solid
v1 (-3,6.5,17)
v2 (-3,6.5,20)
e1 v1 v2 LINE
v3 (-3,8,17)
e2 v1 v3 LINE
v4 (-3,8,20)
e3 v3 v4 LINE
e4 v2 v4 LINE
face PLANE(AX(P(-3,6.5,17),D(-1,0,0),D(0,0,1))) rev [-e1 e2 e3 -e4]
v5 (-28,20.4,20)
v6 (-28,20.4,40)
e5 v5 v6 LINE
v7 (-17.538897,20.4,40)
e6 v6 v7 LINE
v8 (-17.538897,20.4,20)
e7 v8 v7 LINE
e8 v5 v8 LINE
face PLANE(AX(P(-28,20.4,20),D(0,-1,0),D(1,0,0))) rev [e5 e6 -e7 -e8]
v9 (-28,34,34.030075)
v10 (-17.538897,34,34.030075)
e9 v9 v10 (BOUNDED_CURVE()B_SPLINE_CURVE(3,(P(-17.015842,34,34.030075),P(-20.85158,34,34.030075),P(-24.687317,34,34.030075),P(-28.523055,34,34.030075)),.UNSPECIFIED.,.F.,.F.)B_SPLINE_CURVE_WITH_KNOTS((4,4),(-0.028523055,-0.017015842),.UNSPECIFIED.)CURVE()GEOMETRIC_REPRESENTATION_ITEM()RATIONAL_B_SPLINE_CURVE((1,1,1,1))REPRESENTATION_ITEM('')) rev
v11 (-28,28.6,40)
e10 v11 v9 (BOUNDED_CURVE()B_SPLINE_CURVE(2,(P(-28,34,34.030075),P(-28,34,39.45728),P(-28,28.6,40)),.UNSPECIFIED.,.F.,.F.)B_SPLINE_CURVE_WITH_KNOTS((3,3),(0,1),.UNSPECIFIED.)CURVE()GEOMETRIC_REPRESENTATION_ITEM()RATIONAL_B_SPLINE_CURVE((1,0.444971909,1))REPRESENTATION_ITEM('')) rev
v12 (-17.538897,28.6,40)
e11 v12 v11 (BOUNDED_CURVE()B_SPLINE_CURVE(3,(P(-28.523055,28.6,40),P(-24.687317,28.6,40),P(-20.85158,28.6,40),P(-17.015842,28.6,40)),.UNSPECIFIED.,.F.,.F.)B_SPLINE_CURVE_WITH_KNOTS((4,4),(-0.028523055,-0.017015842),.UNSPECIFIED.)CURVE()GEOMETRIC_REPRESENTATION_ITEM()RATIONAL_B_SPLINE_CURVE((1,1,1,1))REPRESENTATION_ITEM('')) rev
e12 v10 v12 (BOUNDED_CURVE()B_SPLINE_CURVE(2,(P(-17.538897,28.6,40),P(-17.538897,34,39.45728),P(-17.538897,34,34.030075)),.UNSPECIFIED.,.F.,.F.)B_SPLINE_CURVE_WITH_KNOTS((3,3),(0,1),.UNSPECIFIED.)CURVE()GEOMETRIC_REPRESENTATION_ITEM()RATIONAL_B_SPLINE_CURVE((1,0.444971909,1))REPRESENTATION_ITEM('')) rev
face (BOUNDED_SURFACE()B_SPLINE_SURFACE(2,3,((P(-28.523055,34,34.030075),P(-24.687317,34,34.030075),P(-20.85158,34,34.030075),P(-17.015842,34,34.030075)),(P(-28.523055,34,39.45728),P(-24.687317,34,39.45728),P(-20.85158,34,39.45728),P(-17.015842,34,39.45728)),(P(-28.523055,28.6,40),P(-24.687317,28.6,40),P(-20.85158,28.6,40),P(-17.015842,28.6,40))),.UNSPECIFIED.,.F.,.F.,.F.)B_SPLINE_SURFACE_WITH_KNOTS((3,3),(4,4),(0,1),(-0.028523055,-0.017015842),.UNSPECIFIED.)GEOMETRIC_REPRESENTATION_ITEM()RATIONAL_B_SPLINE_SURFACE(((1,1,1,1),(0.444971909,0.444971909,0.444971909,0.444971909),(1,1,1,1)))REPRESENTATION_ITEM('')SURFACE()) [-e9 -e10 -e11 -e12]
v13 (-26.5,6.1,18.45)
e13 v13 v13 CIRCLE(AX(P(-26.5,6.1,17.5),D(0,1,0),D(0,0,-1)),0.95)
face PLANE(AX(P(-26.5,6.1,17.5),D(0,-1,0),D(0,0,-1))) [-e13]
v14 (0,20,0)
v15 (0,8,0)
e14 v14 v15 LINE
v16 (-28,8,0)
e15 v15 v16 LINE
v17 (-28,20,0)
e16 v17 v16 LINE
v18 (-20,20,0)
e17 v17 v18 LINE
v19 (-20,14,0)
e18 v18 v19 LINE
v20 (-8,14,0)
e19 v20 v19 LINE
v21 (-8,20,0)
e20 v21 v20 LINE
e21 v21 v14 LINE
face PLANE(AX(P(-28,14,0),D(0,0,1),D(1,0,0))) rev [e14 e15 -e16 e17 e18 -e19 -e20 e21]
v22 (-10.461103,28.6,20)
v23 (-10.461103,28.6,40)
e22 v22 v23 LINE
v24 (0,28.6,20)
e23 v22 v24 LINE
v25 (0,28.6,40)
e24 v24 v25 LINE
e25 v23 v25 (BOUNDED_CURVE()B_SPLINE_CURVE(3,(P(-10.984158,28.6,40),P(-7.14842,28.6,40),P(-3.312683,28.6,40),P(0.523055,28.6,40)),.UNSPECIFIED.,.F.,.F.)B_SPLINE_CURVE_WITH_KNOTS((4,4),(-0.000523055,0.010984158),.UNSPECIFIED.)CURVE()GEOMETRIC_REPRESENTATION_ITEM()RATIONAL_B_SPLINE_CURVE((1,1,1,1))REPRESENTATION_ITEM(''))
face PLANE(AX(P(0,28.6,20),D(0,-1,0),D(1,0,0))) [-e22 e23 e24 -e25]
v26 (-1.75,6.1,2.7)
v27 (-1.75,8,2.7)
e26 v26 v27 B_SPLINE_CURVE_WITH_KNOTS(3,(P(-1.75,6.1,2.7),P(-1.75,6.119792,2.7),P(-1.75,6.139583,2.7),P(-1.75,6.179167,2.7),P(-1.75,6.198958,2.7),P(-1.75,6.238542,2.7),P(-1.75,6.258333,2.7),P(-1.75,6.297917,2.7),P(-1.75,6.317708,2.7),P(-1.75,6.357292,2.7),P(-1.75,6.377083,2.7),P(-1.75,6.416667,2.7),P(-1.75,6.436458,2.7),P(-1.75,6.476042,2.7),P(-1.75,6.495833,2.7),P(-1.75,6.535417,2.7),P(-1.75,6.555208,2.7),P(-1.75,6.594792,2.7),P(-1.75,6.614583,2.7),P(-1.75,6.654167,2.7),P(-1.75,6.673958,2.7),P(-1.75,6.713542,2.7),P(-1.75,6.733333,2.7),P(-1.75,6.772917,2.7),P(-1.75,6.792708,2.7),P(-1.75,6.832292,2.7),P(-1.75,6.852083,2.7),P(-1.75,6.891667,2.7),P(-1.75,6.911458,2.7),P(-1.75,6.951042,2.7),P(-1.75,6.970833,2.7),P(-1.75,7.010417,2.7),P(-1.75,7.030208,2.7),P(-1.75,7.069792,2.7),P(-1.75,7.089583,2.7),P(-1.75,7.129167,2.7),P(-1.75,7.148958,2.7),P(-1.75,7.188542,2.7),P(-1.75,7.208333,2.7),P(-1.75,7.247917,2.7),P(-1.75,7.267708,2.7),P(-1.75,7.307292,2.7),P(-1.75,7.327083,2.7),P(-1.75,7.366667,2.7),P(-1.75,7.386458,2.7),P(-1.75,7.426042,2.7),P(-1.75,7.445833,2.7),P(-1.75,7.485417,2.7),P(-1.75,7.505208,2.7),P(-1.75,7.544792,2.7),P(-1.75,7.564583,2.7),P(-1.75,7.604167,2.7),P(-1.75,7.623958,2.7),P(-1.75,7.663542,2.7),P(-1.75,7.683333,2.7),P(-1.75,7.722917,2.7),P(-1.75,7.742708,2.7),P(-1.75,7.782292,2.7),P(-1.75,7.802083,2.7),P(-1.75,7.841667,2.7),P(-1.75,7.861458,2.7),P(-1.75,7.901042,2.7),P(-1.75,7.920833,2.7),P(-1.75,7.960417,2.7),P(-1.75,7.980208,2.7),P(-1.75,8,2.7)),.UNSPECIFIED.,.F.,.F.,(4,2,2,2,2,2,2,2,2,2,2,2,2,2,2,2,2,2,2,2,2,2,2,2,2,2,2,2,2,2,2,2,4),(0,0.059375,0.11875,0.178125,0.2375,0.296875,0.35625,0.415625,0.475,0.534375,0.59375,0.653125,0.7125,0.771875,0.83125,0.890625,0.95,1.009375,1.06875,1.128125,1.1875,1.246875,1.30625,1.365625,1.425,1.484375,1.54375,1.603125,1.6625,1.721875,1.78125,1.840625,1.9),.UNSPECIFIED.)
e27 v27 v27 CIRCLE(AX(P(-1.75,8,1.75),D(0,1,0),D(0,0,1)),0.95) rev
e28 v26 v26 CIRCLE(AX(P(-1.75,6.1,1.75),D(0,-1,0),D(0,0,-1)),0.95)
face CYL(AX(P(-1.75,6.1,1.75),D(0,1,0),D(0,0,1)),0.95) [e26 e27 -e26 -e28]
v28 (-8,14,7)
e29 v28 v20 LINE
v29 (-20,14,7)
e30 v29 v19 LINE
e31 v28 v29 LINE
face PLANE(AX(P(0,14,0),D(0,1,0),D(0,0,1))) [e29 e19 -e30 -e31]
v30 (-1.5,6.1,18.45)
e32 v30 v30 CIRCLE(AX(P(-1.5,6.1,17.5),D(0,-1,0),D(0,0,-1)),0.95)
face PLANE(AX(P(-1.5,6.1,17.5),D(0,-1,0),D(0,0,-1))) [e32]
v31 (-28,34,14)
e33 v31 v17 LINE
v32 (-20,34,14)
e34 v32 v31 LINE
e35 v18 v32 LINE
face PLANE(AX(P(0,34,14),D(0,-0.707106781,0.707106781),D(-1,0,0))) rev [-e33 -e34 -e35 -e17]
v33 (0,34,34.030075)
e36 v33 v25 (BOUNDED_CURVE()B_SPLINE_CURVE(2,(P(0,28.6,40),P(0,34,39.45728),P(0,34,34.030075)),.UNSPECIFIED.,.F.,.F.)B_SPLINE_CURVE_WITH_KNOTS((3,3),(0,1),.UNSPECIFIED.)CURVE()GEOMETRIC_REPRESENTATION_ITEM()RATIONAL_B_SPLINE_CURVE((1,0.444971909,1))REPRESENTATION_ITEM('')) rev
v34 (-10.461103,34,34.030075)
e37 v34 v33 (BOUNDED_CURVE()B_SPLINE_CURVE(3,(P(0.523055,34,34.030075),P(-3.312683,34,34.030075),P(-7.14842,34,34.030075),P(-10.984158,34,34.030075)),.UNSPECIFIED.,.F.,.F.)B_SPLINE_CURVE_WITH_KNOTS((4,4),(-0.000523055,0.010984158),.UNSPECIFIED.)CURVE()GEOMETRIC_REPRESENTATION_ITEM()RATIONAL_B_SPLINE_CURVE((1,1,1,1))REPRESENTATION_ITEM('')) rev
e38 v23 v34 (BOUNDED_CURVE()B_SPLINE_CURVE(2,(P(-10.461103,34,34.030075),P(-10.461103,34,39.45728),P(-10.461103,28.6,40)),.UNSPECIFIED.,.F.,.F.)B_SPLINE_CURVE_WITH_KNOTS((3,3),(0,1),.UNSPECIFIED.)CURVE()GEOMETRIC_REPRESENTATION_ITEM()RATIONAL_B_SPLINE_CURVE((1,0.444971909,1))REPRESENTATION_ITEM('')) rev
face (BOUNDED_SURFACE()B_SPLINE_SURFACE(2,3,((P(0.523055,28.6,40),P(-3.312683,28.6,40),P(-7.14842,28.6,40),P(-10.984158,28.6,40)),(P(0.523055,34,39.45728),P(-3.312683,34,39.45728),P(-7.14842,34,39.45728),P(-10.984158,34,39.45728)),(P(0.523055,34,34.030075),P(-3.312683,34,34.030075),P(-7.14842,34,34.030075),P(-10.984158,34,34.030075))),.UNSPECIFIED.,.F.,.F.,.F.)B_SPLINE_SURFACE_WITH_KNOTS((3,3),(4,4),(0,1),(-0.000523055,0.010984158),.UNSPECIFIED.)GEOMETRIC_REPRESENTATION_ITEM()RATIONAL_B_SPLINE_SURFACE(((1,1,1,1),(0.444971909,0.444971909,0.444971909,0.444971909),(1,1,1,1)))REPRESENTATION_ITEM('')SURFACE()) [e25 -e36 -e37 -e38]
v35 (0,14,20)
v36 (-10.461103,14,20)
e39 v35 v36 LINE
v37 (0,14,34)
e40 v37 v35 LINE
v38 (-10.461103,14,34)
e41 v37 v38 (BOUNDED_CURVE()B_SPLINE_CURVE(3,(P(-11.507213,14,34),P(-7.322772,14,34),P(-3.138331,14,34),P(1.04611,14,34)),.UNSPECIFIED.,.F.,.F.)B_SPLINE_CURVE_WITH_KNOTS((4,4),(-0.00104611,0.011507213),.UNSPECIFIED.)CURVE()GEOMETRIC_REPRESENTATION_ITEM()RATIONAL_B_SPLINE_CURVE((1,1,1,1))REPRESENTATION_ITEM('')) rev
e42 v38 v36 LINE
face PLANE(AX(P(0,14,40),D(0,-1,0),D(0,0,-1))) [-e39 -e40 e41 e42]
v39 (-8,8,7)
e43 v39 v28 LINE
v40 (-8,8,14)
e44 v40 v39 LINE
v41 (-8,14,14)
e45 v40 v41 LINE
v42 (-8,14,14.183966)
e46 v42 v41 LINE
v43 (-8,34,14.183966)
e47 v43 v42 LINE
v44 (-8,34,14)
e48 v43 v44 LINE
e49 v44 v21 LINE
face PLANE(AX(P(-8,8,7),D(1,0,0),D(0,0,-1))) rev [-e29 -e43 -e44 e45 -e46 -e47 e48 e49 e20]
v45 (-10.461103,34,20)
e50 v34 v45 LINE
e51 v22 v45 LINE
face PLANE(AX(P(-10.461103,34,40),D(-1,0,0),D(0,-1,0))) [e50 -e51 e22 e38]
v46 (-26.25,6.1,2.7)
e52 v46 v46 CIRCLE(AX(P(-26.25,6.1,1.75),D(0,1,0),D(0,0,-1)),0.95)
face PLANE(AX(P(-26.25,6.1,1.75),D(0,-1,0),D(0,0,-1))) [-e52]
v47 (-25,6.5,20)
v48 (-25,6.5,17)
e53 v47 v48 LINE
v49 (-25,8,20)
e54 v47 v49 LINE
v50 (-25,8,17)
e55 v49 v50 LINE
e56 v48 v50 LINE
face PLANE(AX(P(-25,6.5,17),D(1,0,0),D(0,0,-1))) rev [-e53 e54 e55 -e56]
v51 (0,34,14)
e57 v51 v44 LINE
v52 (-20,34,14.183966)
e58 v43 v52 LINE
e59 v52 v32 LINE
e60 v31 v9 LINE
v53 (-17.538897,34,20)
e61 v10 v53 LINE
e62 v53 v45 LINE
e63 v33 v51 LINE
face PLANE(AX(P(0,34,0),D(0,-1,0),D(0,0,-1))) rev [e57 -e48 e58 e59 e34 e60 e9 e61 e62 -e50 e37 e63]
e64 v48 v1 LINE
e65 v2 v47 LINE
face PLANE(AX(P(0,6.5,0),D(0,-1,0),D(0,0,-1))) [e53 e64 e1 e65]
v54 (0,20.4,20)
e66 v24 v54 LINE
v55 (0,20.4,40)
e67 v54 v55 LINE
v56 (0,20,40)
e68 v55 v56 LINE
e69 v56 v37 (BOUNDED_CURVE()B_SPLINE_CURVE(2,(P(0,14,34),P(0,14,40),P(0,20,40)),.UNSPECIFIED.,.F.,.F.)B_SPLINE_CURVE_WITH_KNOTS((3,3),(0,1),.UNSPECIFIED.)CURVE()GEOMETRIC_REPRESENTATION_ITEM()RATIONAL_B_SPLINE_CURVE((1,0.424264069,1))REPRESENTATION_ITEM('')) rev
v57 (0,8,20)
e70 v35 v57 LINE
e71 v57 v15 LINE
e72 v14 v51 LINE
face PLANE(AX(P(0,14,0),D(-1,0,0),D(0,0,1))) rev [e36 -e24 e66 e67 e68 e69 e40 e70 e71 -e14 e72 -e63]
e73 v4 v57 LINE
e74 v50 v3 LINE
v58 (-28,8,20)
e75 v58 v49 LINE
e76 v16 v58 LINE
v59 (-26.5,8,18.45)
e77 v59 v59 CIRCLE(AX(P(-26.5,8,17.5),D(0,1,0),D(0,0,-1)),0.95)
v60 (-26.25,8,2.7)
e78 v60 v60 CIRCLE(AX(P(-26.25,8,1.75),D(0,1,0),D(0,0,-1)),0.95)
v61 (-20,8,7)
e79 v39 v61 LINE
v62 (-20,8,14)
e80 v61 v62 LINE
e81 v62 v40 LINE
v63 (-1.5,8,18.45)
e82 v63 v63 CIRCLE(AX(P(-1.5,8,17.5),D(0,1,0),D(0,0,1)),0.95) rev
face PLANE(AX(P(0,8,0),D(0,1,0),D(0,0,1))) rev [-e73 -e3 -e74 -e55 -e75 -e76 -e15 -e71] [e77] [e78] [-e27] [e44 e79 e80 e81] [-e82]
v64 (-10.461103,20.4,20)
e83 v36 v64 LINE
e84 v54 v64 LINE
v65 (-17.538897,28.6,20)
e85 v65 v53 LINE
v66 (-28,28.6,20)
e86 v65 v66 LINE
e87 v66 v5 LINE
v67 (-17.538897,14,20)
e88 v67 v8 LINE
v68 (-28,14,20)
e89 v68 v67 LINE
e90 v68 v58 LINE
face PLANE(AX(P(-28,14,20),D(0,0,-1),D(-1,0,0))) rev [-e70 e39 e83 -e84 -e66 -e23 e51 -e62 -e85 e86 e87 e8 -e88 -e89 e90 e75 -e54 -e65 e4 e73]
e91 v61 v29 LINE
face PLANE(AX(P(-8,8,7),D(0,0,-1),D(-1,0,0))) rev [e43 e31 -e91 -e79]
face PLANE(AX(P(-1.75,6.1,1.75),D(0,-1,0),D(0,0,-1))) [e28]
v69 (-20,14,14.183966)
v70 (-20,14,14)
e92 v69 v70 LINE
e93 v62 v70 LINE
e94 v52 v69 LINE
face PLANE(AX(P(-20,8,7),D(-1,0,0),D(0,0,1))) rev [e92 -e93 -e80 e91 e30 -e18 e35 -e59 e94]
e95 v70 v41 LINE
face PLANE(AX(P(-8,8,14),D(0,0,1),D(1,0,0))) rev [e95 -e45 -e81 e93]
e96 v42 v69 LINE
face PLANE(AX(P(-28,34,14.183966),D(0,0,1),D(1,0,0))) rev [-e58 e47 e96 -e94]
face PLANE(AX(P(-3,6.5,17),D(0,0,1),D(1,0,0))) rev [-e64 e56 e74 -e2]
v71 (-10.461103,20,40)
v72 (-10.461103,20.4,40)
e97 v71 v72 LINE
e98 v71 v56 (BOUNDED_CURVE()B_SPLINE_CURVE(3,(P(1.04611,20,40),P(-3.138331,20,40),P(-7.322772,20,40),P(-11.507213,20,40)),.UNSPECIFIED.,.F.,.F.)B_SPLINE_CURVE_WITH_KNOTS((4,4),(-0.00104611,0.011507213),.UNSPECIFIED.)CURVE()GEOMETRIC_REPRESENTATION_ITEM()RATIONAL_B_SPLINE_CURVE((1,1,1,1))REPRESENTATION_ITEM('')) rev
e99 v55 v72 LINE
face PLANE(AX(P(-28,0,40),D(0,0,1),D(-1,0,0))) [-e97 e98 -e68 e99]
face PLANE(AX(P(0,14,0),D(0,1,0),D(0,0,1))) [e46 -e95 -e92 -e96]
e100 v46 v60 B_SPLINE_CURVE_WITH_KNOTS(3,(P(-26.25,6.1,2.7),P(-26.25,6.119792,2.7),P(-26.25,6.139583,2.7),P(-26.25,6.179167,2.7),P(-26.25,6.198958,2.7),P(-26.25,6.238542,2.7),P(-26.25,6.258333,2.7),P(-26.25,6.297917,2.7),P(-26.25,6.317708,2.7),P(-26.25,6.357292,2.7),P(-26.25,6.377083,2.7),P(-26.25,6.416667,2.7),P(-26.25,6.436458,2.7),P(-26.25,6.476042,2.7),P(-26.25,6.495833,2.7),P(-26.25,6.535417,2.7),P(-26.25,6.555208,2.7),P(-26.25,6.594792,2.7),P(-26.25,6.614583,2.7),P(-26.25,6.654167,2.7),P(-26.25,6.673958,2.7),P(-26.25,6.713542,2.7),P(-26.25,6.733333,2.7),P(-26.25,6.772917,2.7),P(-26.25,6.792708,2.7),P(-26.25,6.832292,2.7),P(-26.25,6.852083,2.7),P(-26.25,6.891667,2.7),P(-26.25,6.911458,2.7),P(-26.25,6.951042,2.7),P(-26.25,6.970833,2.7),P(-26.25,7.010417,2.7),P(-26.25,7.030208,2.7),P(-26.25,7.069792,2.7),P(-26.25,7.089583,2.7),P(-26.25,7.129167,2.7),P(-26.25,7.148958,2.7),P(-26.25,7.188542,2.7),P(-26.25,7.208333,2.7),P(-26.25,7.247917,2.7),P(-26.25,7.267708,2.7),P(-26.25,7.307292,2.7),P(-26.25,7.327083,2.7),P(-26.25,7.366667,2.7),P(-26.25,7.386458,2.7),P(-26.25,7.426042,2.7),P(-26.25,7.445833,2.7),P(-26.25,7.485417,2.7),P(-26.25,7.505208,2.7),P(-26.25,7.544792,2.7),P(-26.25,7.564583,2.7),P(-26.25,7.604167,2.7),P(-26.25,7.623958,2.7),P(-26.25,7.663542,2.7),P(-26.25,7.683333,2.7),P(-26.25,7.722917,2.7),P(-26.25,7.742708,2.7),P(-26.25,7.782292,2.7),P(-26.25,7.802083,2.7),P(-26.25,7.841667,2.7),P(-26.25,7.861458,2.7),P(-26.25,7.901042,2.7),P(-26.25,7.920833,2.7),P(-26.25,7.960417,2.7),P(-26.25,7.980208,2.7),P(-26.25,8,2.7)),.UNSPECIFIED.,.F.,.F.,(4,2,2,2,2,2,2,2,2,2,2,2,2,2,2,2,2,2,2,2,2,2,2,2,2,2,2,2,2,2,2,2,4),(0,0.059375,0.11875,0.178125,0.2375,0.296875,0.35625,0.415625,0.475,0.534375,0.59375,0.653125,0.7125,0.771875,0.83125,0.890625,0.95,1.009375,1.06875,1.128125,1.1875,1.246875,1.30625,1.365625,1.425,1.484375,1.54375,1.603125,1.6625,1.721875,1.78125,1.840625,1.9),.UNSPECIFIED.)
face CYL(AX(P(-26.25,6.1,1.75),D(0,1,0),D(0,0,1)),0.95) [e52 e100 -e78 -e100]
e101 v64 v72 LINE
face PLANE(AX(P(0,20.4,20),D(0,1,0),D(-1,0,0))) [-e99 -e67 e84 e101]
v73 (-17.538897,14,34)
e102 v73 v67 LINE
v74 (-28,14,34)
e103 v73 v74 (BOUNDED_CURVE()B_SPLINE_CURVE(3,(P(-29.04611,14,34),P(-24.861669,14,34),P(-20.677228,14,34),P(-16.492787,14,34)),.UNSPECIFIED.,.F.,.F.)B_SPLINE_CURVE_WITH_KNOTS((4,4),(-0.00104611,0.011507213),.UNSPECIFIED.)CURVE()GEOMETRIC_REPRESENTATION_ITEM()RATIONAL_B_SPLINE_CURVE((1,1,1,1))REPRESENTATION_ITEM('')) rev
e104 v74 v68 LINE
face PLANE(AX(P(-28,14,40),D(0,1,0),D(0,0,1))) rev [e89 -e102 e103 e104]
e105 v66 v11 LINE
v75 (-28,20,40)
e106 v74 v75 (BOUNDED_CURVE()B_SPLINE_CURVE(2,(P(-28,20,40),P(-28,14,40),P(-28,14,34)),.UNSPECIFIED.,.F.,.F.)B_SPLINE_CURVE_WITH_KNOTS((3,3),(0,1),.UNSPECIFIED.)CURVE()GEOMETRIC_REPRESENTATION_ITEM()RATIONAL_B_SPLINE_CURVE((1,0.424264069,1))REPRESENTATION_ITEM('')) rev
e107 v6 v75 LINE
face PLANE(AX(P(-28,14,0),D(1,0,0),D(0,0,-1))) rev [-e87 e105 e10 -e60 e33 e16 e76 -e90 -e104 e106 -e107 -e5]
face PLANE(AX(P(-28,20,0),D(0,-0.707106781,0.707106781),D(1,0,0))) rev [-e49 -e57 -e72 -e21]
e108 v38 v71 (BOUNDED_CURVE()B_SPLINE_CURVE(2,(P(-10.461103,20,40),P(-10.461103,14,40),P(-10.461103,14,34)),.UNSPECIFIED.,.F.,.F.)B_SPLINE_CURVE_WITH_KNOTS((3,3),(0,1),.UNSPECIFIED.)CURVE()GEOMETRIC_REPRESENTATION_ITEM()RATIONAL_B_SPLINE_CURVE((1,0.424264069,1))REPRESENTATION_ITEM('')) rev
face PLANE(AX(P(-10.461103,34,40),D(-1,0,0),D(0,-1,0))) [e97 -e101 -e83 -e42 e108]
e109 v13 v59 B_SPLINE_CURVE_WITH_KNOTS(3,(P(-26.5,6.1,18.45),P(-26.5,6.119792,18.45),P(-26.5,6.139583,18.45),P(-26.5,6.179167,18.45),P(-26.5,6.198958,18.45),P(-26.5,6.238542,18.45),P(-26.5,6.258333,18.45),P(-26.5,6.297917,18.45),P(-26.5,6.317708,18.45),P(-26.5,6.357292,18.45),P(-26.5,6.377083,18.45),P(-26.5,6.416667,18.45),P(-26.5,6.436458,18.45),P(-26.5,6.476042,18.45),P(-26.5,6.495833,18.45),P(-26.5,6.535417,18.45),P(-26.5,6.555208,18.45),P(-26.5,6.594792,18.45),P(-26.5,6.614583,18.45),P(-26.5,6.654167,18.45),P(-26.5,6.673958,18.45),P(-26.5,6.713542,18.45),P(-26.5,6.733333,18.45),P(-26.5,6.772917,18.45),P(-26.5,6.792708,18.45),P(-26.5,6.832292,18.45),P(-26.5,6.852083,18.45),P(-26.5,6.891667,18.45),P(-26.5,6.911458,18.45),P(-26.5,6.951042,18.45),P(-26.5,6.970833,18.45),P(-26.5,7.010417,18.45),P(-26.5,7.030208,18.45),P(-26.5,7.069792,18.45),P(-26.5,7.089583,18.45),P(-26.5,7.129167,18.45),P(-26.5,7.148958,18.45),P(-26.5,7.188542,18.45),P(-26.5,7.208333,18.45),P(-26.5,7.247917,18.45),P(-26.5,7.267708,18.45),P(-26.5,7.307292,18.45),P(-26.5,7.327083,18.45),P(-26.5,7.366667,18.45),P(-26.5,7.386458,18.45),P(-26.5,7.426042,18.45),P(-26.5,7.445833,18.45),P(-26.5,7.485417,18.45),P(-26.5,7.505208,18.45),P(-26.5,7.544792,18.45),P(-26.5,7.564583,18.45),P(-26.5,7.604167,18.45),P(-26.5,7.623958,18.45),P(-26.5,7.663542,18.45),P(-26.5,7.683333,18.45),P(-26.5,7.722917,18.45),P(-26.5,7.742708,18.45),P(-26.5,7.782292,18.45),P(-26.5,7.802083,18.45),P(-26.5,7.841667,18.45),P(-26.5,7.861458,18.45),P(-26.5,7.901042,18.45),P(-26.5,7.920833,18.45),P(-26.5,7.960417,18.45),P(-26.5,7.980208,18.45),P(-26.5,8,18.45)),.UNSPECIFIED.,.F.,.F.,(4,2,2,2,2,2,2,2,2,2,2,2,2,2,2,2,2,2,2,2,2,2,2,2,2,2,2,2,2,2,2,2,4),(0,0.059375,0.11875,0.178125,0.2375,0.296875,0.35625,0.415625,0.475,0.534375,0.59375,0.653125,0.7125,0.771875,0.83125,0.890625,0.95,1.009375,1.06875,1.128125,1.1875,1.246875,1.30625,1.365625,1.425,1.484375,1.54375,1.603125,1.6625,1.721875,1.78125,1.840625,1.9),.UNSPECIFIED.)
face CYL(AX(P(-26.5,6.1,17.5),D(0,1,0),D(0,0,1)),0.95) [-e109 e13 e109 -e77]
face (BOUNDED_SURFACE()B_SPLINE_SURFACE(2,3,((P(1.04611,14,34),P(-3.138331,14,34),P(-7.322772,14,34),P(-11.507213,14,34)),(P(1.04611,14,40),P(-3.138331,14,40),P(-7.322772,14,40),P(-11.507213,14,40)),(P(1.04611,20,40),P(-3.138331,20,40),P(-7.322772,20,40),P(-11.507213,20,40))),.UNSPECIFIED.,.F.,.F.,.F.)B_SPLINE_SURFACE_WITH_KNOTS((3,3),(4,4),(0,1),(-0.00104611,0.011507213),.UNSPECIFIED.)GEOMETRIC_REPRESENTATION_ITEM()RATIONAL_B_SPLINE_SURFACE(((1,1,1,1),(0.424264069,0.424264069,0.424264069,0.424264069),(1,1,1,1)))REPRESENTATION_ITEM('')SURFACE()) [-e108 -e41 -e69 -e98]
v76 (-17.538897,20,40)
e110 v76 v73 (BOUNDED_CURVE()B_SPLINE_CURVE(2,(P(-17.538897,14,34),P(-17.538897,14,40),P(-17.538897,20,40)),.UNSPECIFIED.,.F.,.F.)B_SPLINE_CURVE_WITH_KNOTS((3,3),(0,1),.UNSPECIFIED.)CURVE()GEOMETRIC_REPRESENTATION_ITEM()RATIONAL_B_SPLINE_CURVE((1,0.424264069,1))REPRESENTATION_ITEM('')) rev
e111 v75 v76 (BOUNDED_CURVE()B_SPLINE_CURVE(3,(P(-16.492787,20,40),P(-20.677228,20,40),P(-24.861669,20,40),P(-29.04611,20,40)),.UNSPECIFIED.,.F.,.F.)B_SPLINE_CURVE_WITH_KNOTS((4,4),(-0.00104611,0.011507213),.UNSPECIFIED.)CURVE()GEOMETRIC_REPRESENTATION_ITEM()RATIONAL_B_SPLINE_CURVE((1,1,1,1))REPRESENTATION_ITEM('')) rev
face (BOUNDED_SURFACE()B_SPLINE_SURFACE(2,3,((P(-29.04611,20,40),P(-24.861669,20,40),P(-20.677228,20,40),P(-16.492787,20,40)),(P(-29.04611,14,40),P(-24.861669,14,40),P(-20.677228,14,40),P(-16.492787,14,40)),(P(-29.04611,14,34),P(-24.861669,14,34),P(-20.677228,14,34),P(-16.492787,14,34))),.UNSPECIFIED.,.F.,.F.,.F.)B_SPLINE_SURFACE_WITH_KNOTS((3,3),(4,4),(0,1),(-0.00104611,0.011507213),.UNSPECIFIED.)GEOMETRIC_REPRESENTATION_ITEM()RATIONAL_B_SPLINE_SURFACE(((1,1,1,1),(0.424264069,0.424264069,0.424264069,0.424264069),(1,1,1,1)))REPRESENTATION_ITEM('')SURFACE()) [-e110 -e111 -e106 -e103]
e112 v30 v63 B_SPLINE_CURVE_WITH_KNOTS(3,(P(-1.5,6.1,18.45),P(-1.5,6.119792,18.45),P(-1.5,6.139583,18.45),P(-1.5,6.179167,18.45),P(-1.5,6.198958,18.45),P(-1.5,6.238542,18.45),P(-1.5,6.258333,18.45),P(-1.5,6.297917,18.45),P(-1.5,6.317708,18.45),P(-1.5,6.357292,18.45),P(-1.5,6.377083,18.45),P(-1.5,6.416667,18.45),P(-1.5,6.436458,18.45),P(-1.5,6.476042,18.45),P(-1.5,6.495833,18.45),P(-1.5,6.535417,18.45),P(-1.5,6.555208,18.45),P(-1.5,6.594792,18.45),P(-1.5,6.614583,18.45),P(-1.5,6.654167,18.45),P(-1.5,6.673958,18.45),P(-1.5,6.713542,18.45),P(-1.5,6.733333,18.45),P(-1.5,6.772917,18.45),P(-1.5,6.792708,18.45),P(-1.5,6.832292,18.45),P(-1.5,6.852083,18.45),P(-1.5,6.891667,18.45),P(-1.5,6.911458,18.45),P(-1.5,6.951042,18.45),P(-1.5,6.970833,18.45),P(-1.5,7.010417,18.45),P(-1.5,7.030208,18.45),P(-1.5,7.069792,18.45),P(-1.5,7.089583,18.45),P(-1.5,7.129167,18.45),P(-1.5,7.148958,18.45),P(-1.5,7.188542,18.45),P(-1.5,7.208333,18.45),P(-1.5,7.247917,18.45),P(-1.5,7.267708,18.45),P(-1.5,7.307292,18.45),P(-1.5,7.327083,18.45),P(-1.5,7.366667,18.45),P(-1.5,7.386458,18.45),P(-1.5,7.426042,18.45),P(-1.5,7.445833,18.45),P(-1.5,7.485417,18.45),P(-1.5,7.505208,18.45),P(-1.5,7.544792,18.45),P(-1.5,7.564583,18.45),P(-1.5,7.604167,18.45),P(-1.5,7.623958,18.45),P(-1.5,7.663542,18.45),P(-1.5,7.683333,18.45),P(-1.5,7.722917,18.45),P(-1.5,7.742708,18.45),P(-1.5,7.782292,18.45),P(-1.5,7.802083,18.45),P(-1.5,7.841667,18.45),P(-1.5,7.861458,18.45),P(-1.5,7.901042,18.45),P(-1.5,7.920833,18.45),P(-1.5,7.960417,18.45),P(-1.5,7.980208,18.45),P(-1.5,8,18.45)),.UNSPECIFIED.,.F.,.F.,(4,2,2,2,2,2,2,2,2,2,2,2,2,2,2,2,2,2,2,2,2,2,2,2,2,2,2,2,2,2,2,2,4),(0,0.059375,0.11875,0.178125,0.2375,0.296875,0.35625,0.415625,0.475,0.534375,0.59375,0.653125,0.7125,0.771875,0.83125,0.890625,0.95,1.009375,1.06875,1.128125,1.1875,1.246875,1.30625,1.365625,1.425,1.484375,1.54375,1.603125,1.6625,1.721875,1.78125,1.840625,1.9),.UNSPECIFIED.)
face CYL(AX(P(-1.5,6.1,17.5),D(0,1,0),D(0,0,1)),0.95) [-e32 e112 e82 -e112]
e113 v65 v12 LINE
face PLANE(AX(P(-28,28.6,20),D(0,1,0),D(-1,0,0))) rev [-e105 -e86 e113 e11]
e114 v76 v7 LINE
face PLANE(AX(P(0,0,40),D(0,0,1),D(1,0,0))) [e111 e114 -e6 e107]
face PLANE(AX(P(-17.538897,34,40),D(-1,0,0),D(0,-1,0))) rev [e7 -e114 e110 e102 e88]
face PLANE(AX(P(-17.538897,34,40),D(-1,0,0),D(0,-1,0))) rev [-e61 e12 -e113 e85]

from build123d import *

# Parameters (mm, degrees)
ESQUISSE1_W             = 28
ESQUISSE1_H             = 20
BOSS_EXTRU_1_DEPTH      = 6
ESQUISSE3_W             = 12
ESQUISSE3_H             = 7
ENL_V_MAT_EXTRU_1_DEPTH = 35.928498393
ESQUISSE4_W             = 22
ESQUISSE4_H             = 3
BOSS_EXTRU_2_DEPTH      = 1.5
ESQUISSE5_R             = 0.95
BOSS_EXTRU_3_DEPTH      = 1.9
ESQUISSE6_R             = 0.95
BOSS_EXTRU_4_DEPTH      = 1.9
ESQUISSE12_W            = 28
ESQUISSE12_H            = 5.816034141
BOSS_EXTRU_5_DEPTH      = 20
ESQUISSE13_W            = 8
ESQUISSE13_H            = 14.813855777
BOSS_EXTRU_7_DEPTH      = 20
CHANFREIN4_SIZE         = 14
ESQUISSE15_W            = 10.461102818
ESQUISSE15_H            = 20
BOSS_EXTRU_8_DEPTH      = 20
ESQUISSE16_W            = 10.461102818
ESQUISSE16_H            = 8.2
ENL_V_MAT_EXTRU_2_DEPTH = 20
CONG_3_SIZE             = 6
CONG_4_START            = -29
CONG_4_DEPTH            = 11.461102818
SYM_TRIE3_START         = -8
SYM_TRIE3_DEPTH         = 8
SYM_TRIE3_START_2       = -10.461102818
SYM_TRIE3_2_DEPTH       = 2.461102818


with BuildPart() as part:
    # Esquisse1 → Boss.-Extru.1 (new body)
    with BuildSketch(Plane(origin=(0, 8, 0), x_dir=(1, 0, 0), z_dir=(0, 1, 0))):
        with Locations((-14, -10)):
            Rectangle(ESQUISSE1_W, ESQUISSE1_H)
    extrude(amount=BOSS_EXTRU_1_DEPTH)

    # Esquisse3 → Enlèv. mat.-Extru.1 (cut, through all)
    with BuildSketch(Plane(origin=(0, 14, 0), x_dir=(1, 0, 0), z_dir=(0, 1, 0))):
        with Locations((-14, -10.5)):
            Rectangle(ESQUISSE3_W, ESQUISSE3_H)
    extrude(amount=-ENL_V_MAT_EXTRU_1_DEPTH, mode=Mode.SUBTRACT)

    # Esquisse4 → Boss.-Extru.2 (add)
    with BuildSketch(Plane.XZ.offset(-8)):
        with Locations((-14, 18.5)):
            Rectangle(ESQUISSE4_W, ESQUISSE4_H)
    extrude(amount=BOSS_EXTRU_2_DEPTH)

    # Esquisse5 → Boss.-Extru.3 (add)
    with BuildSketch(Plane.XZ.offset(-8)):
        with Locations(Location((-1.75, 1.75, 0), (0, 0, 90))):
            Circle(ESQUISSE5_R)
    boss_extru_3 = extrude(amount=BOSS_EXTRU_3_DEPTH)

    # Esquisse6 → Boss.-Extru.4 (add)
    with BuildSketch(Plane.XZ.offset(-8)):
        with Locations(Location((-1.5, 17.5, 0), (0, 0, 90))):
            Circle(ESQUISSE6_R)
    boss_extru_4 = extrude(amount=BOSS_EXTRU_4_DEPTH)

    # Symétrie2: Boss.-Extru.3, Boss.-Extru.4 across plane
    add(boss_extru_3.mirror(Plane(origin=(-14, 0, 0), x_dir=(0, 0, 1), z_dir=(1, 0, 0))))
    add(boss_extru_4.mirror(Plane(origin=(-14, 0, 0), x_dir=(0, 0, 1), z_dir=(1, 0, 0))))

    # Esquisse12 → Boss.-Extru.5 (add)
    with BuildSketch(Plane(origin=(0, 14, 0), x_dir=(1, 0, 0), z_dir=(0, 1, 0))):
        with Locations((-14, -17.091982929)):
            Rectangle(ESQUISSE12_W, ESQUISSE12_H)
    extrude(amount=BOSS_EXTRU_5_DEPTH)

    # Esquisse13 → Boss.-Extru.7 (add)
    with BuildSketch(Plane(origin=(0, 14, 0), x_dir=(1, 0, 0), z_dir=(0, 1, 0))):
        with Locations((-24, -7.406927889)):
            Rectangle(ESQUISSE13_W, ESQUISSE13_H)
    extrude(amount=BOSS_EXTRU_7_DEPTH)

    # Chanfrein4
    chanfrein4_edges = [part.edges().sort_by_distance(p)[0] for p in [
        (-24, 34, 0),
    ]]
    chamfer(chanfrein4_edges, length=CHANFREIN4_SIZE)

    # Esquisse15 → Boss.-Extru.8 (add)
    with BuildSketch(Plane.XY.offset(20)):
        with Locations((-22.769448591, 24)):
            Rectangle(ESQUISSE15_W, ESQUISSE15_H)
    extrude(amount=BOSS_EXTRU_8_DEPTH)

    # Esquisse16 → Enlèv. mat.-Extru.2 (cut)
    with BuildSketch(Plane.XY.offset(40)):
        with Locations((-22.769448591, 24.5)):
            Rectangle(ESQUISSE16_W, ESQUISSE16_H)
    extrude(amount=-ENL_V_MAT_EXTRU_2_DEPTH, mode=Mode.SUBTRACT)

    # Congé3
    # a fillet whose section is not a circle: 6 mm, written as the material it takes off along each edge
    with BuildSketch(Plane(origin=(-2.538897182, 14, 40), x_dir=(0, 1, 0), z_dir=(-1, 0, 0))) as cong_3_piece_1:
        with BuildLine():
            Bezier((CONG_3_SIZE, 0), (0, 0), (0, CONG_3_SIZE), weights=[1, 0.424264069, 1])
            Line((0, CONG_3_SIZE), (0, 0))
            Line((0, 0), (CONG_3_SIZE, 0))
        make_face()
    extrude(amount=40.461102818, mode=Mode.SUBTRACT)

    # Congé4: read off the stored shape, not the designer's step
    # Congé4 outline → Congé4 (cut)
    with BuildSketch(Plane.YZ.offset(CONG_4_START)):
        with BuildLine():
            add(Edge.make_bspline(
                [(34, 34.030075377), (34, 39.45727958), (28.6, 40)],
                knots=[0, 0, 0, 1, 1, 1], degree=2, weights=[1, 0.444971909, 1]))
            Line((34, 34.030075377), (34, 40))
            Line((34, 40), (28.6, 40))
        make_face()
    extrude(amount=CONG_4_DEPTH, mode=Mode.SUBTRACT)

    # Symétrie3: read off the stored shape, not the designer's step
    # Symétrie3 outline → Symétrie3 (add)
    with BuildSketch(Plane.YZ.offset(SYM_TRIE3_START)):
        Polygon((34, 14), (34, 14.183965859), (14, 14.183965859), (14, 0), (20, 0), align=None)
        with BuildLine():
            Line((28.6, 40), (28.6, 20))
            Line((28.6, 20), (34, 20))
            Line((34, 20), (34, 34.030075377))
            add(Edge.make_bspline(
                [(28.6, 40), (34, 39.45727958), (34, 34.030075377)],
                knots=[0, 0, 0, 1, 1, 1], degree=2, weights=[1, 0.444971909, 1]))
        make_face()
        with BuildLine():
            add(Edge.make_bspline(
                [(14, 34), (14, 40), (20, 40)],
                knots=[0, 0, 0, 1, 1, 1], degree=2, weights=[1, 0.424264069, 1]))
            Line((14, 34), (14, 20))
            Line((14, 20), (20.4, 20))
            Line((20.4, 20), (20.4, 40))
            Line((20.4, 40), (20, 40))
        make_face()
    extrude(amount=SYM_TRIE3_DEPTH)

    # Sym_trie3 2 outline → Sym_trie3 2 (add)
    with BuildSketch(Plane.YZ.offset(SYM_TRIE3_START_2)):
        with BuildLine():
            Line((28.6, 40), (28.6, 20))
            Line((28.6, 20), (34, 20))
            Line((34, 20), (34, 34.030075377))
            add(Edge.make_bspline(
                [(28.6, 40), (34, 39.45727958), (34, 34.030075377)],
                knots=[0, 0, 0, 1, 1, 1], degree=2, weights=[1, 0.444971909, 1]))
        make_face()
        with BuildLine():
            add(Edge.make_bspline(
                [(14, 34), (14, 40), (20, 40)],
                knots=[0, 0, 0, 1, 1, 1], degree=2, weights=[1, 0.424264069, 1]))
            Line((14, 34), (14, 20))
            Line((14, 20), (20.4, 20))
            Line((20.4, 20), (20.4, 40))
            Line((20.4, 40), (20, 40))
        make_face()
    extrude(amount=SYM_TRIE3_2_DEPTH)


solid = part.part
